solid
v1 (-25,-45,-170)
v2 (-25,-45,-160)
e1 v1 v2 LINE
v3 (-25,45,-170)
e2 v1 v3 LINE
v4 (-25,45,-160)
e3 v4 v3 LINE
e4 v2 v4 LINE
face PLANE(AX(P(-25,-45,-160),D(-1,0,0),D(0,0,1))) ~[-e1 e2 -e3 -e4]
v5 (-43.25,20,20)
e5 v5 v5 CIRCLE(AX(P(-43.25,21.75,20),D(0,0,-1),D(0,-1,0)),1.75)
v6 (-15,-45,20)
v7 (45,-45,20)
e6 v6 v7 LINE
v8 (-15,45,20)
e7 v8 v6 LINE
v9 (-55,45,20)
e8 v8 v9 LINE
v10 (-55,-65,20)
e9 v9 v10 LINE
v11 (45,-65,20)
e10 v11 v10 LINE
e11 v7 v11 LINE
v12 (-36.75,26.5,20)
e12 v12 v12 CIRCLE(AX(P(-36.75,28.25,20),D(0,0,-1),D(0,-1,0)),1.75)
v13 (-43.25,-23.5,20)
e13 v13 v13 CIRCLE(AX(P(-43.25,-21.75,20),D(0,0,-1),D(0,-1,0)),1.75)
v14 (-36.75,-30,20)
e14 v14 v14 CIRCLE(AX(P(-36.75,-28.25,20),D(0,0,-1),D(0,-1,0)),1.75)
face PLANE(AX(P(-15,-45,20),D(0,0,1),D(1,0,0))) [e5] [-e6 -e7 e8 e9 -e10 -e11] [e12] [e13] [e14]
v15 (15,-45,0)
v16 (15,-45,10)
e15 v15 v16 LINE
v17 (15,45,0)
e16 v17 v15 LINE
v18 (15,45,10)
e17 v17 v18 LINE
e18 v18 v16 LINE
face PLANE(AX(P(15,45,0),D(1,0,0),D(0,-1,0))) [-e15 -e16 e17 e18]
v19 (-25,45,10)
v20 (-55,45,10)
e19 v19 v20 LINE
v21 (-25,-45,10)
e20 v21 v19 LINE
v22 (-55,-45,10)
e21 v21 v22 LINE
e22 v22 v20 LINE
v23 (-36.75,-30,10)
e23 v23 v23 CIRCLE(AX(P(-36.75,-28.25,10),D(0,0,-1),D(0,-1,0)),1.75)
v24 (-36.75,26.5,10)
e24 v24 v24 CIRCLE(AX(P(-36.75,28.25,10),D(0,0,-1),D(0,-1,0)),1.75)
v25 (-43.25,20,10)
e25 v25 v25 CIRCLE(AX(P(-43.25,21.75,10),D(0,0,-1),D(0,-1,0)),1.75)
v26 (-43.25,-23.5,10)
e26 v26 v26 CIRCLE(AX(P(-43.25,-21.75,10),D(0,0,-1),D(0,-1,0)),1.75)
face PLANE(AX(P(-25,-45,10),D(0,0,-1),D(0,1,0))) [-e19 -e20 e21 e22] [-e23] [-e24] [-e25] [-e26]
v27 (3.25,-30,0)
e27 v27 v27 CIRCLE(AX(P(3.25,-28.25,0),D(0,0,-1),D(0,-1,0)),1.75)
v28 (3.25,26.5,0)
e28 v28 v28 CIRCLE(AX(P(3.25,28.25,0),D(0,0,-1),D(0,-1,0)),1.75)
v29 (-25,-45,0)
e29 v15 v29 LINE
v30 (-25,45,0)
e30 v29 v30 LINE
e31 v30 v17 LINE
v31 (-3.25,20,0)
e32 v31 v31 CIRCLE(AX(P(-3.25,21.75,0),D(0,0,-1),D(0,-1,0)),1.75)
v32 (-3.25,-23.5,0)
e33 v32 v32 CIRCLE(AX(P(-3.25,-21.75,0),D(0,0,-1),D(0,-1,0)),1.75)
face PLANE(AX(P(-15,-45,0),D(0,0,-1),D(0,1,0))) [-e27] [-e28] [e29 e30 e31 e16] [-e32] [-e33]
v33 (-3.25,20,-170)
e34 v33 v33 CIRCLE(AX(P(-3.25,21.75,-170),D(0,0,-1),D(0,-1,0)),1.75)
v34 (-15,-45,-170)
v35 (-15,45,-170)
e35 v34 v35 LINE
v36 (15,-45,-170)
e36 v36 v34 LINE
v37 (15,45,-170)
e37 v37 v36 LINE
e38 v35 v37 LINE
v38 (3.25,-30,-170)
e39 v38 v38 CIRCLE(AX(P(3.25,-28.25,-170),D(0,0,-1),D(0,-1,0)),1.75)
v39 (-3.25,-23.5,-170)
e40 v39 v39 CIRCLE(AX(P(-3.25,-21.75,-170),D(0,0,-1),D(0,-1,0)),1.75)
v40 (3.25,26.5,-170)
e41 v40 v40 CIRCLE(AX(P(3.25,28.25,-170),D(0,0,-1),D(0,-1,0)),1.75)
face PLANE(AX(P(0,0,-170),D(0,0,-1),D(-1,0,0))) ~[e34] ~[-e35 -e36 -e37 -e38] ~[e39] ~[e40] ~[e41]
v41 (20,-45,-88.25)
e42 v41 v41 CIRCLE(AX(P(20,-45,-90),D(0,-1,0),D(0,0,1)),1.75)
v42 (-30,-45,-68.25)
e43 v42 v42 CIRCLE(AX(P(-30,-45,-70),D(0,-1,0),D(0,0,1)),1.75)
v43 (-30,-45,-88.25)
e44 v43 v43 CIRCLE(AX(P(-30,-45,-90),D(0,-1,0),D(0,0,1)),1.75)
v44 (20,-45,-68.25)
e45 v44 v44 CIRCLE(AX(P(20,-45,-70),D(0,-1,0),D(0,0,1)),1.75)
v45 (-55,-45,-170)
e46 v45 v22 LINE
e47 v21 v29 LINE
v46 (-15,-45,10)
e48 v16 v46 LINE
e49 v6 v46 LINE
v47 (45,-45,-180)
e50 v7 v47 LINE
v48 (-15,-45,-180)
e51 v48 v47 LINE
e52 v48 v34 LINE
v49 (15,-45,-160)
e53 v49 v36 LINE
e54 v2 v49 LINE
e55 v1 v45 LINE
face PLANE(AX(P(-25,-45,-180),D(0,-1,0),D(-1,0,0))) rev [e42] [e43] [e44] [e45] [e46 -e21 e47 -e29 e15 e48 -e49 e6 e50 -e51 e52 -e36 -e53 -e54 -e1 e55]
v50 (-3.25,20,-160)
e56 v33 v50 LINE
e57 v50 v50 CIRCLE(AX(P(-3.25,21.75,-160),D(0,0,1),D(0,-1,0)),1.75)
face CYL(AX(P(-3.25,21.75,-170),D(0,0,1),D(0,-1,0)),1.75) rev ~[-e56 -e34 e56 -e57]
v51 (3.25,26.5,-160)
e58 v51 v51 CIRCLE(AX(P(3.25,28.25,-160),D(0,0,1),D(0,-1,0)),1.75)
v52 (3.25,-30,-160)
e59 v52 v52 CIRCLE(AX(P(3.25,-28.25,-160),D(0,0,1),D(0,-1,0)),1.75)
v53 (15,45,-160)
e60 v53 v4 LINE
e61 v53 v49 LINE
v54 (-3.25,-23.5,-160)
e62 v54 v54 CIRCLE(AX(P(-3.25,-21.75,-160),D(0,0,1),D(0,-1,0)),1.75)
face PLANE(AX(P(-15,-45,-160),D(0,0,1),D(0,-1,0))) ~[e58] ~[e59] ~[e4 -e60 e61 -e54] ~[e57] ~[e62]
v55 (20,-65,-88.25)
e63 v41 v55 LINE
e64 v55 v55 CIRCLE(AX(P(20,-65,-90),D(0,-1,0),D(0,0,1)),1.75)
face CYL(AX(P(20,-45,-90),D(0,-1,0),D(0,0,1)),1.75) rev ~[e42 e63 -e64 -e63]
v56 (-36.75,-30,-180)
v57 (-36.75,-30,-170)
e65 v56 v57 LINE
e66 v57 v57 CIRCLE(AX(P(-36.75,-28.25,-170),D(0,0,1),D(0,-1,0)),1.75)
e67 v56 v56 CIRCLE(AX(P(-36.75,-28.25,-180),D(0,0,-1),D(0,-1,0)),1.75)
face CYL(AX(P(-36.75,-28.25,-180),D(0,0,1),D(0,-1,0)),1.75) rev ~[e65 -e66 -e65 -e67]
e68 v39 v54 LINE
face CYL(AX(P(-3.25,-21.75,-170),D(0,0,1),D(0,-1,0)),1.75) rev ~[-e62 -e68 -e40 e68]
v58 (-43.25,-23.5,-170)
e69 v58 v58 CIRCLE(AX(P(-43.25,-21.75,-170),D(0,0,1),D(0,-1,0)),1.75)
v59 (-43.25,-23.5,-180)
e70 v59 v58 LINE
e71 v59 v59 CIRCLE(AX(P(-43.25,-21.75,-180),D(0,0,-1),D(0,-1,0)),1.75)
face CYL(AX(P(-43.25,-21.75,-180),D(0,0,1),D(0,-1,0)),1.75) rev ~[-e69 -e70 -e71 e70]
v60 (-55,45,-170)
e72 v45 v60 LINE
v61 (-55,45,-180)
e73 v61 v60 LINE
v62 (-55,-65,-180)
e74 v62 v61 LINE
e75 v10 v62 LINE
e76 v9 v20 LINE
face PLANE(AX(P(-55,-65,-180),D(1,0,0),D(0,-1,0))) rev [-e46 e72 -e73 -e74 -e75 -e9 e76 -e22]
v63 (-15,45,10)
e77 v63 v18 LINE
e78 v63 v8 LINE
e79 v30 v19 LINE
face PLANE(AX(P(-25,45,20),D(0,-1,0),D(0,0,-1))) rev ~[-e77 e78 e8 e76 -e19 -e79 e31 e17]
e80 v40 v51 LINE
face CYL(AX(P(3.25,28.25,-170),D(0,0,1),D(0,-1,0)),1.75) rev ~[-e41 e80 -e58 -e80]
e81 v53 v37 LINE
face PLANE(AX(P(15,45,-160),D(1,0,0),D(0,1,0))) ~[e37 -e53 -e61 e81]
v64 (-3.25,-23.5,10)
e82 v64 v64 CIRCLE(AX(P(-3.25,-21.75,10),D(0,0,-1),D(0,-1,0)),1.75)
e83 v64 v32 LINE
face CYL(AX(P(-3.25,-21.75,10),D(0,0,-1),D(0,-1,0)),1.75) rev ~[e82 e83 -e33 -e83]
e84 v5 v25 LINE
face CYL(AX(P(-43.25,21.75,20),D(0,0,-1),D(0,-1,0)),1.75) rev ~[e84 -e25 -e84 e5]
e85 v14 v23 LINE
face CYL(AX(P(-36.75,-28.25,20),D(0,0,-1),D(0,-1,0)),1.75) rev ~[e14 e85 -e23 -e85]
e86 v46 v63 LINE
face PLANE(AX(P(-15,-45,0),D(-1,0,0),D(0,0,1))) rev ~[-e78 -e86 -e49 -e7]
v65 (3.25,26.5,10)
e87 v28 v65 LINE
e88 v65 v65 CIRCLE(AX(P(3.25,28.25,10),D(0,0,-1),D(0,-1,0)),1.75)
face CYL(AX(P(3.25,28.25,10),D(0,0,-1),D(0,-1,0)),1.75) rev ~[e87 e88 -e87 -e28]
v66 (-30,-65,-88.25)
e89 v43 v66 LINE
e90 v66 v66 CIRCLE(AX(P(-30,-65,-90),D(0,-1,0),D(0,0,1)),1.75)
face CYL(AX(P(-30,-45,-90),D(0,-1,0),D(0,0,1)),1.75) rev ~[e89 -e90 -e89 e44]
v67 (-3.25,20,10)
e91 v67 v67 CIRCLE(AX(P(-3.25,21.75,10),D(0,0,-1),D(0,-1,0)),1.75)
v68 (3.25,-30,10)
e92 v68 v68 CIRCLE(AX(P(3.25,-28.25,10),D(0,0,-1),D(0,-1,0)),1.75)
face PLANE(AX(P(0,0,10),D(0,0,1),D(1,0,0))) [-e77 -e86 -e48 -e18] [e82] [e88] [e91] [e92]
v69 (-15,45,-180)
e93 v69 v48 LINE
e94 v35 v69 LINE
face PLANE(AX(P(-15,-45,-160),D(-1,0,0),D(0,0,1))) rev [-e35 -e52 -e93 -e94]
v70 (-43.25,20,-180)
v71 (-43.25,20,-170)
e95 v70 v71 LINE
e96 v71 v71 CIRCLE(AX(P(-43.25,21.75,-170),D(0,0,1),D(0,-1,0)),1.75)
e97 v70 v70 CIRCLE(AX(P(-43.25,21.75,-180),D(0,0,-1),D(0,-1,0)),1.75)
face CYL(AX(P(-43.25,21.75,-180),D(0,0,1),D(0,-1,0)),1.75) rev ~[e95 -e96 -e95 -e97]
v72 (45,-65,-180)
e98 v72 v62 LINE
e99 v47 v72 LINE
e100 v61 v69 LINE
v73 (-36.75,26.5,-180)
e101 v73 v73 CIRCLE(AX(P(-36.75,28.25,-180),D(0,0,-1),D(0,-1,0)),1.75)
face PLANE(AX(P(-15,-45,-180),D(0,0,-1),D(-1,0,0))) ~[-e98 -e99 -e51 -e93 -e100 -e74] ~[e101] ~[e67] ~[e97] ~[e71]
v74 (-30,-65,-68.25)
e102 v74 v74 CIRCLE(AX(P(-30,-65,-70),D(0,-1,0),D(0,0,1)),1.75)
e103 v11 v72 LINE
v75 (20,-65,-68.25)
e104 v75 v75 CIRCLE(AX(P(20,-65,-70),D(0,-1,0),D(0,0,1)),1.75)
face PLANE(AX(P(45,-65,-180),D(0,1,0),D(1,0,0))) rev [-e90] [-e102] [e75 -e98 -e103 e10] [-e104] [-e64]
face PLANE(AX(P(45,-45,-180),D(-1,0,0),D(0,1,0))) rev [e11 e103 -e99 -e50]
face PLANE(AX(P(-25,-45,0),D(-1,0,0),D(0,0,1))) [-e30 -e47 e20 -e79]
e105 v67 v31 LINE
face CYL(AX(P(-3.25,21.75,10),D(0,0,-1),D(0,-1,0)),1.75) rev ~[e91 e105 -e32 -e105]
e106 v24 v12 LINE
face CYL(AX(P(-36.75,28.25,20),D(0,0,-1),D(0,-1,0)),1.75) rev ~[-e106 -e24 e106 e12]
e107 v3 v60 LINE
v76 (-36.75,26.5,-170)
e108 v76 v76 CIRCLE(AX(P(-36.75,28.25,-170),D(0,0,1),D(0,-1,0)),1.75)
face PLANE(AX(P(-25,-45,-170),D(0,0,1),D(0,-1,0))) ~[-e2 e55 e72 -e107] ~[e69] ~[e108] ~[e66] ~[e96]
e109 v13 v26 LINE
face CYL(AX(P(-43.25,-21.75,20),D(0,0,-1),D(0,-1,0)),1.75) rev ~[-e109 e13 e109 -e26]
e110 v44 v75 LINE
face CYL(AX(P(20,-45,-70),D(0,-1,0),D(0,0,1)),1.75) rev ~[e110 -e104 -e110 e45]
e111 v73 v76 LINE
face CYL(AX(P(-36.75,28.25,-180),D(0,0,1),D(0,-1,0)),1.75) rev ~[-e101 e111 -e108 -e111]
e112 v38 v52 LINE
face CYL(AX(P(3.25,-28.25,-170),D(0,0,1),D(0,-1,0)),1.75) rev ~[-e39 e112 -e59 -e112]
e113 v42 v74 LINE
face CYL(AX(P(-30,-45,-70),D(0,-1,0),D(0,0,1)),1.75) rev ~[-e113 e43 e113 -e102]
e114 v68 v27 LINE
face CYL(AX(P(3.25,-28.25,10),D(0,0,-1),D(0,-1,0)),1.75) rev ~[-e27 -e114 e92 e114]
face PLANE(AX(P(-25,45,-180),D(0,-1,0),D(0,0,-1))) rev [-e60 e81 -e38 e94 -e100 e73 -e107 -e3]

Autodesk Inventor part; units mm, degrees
ref_plane "YZ Plane" through (0, 0, 0) normal (1, 0, 0) x (0, 1, 0)
ref_plane "XZ Plane" through (0, 0, 0) normal (0, 1, 0) x (-1, 0, 0)
ref_plane "XY Plane" through (0, 0, 0) normal (0, 0, 1) x (1, 0, 0)
sketch "Boceto1" plane through (0, 0, 0) normal (0, 0, 1) x (1, 0, 0)
  line L0 (-15, 45) -> (15, 45)
  line L1 (15, 45) -> (15, -45)
  line L2 (15, -45) -> (-15, -45)
  line L3 (-15, -45) -> (-15, 45)
  line L4 (-15, 45) -> (15, -45) construction
  line L5 (15, 45) -> (-15, -45) construction
  point P0 (0, 0)
  dimension "d0" = 30
  dimension "d1" = 90
extrude "Extrusión1" add sketch "Boceto1" along normal blind 10
sketch "Boceto2" plane through (0, 0, 10) normal (0, 0, 1) x (1, 0, 0)
  line L0 (15, 45) -> (15, -45)
  line L1 (5, 30) -> (5, 20)
  line L2 (-5, 30) -> (5, 30)
  line L3 (5, 20) -> (-5, 30) construction
  line L4 (5, 20) -> (-5, 20)
  line L5 (-5, 20) -> (5, 30) construction
  line L6 (-5, 20) -> (-5, 30)
  line L7 (24, 0) -> (9, 0)
  line L8 (-15, -45) -> (15, -45)
  line L9 (5, 25) -> (5.4102, 25)
  circle A0 centre (-3.25, 21.75) radius 1.75
  circle A1 centre (3.25, 28.25) radius 1.75
  line L10 (5, -20) -> (-5, -20)
  circle A2 centre (-3.25, -21.75) radius 1.75
  line L11 (5, -25) -> (5.4102, -25)
  line L12 (5, -30) -> (5, -20)
  line L13 (-5, -30) -> (5, -30)
  line L14 (5, -20) -> (-5, -30) construction
  line L15 (-5, -20) -> (5, -30) construction
  line L16 (-5, -20) -> (-5, -30)
  circle A3 centre (3.25, -28.25) radius 1.75
  line L17 (-15, -45) -> (-15, 45)
  line L18 (15, -45) -> (15, 45) projected
  line L19 (-15, -45) -> (15, -45) projected
  line L20 (-15, 45) -> (15, 45)
  line L21 (-3.25, 28.25) -> (3.25, 21.75)
  line L22 (-3.25, 21.75) -> (3.25, 28.25)
  point P0 (0, 0)
  point P1 (-113, 215)
  point P2 (-5, 25)
  point P3 (-3.25, -21.75)
  point P4 (3.25, -28.25)
  point P5 (-143, 115)
  point P6 (-3.25, -21.75)
  point P7 (-5, -25)
  point P8 (3.25, -28.25)
  point P9 (0, 25)
  point P10 (0, -25)
  dimension "d4" = 1.75
  dimension "d5" = 1.75
  dimension "d6" = 1.75
  dimension "d7" = 1.75
  dimension "d8" = 10
  dimension "d9" = 10
  dimension "d10" = 10
  dimension "d11" = 15
  dimension "d12" = 0
  dimension "d13" = 30
  dimension "d14" = 0
  dimension "d15" = 90
  dimension "d16" = 15
hole "Agujero1" at (3.25, 28.25, 10) at (-3.25, 21.75, 10) at (-3.25, -21.75, 10) at (3.25, -28.25, 10) direction (0, 0, -1) diameter 3.5 end through all
sketch "Boceto3" plane through (-15, -45, 0) normal (-1, 0, 0) x (0, 0, 1)
  line L0 (0, 0) -> (0, 90) projected
  line L1 (0, 90) -> (20, 90)
  line L2 (20, 90) -> (20, 0)
  line L3 (20, 0) -> (0, 0)
  line L4 (0, 0) -> (0, 90)
  point P0 (0, 45)
  dimension "d24" = 20
  dimension "d25" = 90
extrude "Extrusión2" add sketch "Boceto3" along normal blind 10
sketch "Boceto4" plane through (-25, -45, 0) normal (-1, 0, 0) x (0, 0, 1)
  line L0 (20, 90) -> (10, 90) projected
  line L1 (10, 0) -> (10, 90) projected
  line L2 (20, 90) -> (10, 90)
  line L3 (10, 90) -> (10, 0)
  line L4 (10, 0) -> (20, 0)
  line L5 (20, 0) -> (20, 90)
  point P0 (0, 45)
extrude "Extrusión3" add sketch "Boceto4" along normal blind 30
sketch "Boceto5" plane through (-15, -45, 20) normal (0, 0, 1) x (1, 0, 0)
  line L0 (-40, 0) -> (-70, 90)
  line L1 (-70, 90) -> (-40, 0)
  line L2 (-20, 75) -> (-20, 65)
  line L3 (-30, 75) -> (-20, 75)
  line L4 (-20, 65) -> (-30, 75) construction
  line L5 (-20, 65) -> (-30, 65)
  line L6 (-30, 65) -> (-20, 75) construction
  circle A0 centre (-28.25, 66.75) radius 1.75
  line L7 (-30, 65) -> (-30, 75)
  circle A1 centre (-21.75, 73.25) radius 1.75
  line L8 (-40, -20) -> (-40, 90)
  line L9 (-55, 45) -> (-143, 45)
  line L10 (-20, 25) -> (-30, 25)
  circle A2 centre (-28.25, 23.25) radius 1.75
  line L11 (-20, 15) -> (-20, 25)
  line L12 (-20, 25) -> (-30, 15) construction
  line L13 (-30, 25) -> (-20, 15) construction
  line L14 (-30, 25) -> (-30, 15)
  line L15 (-30, 15) -> (-20, 15)
  circle A3 centre (-21.75, 16.75) radius 1.75
  line L16 (-70, 0) -> (-40, 0)
  line L17 (0, 0) -> (-40, 0) projected
  line L18 (-40, 90) -> (-70, 90)
  line L19 (-40, 0) -> (-40, 90) projected
  point P0 (15, 45)
  point P1 (-30, 70)
  point P2 (-20, 70)
  point P3 (-20, 20)
  point P4 (-30, 20)
  point P5 (-55, 0)
  point P6 (-55, 90)
  dimension "d30" = 3.5
  dimension "d31" = 1.75
  dimension "d32" = 1.75
  dimension "d33" = 1.75
  dimension "d34" = 1.75
  dimension "d35" = 10
  dimension "d36" = 10
  dimension "d38" = 10
  dimension "d39" = -41.1096
  dimension "d40" = 15
  dimension "d41" = 0
  dimension "d42" = 15
  dimension "d43" = 90
  dimension "d45" = 0
hole "Agujero2" at (-36.75, 28.25, 20) at (-43.25, 21.75, 20) at (-43.25, -21.75, 20) at (-36.75, -28.25, 20) direction (0, 0, -1) diameter 3.5 end through all
sketch "Boceto6" plane through (-15, -45, 20) normal (0, 0, 1) x (1, 0, 0)
  line L0 (-10, 0) -> (-40, 0) projected
  line L1 (-40, 0) -> (60, 0)
  line L2 (60, 0) -> (60, -20)
  line L3 (60, -20) -> (-40, -20)
  line L4 (-40, -20) -> (-40, 0)
  point P0 (15, 45)
  dimension "d53" = 20
extrude "Extrusión4" add sketch "Boceto6" against normal blind 100
mirror "Simetría1" about plane through (-5, -55, -80) normal (0, 0, -1) of "Extrusión1", "Agujero1", "Extrusión2", "Agujero2", "Extrusión3", "Extrusión4"
ref_plane "Plano de trabajo2" through (45, -65, -80) normal (0, 0, -1) x (-1, 0, 0)
sketch "Boceto7" plane through (-15, -45, 20) normal (0, 1, 0) x (1, 0, 0)
  line L0 (30, 115) -> (30, 85)
  circle A0 centre (35, 90) radius 1.75
  line L1 (30, 85) -> (40, 85)
  line L2 (35, 110) -> (35, 90)
  circle A1 centre (35, 110) radius 1.75
  line L3 (40, 115) -> (30, 85) construction
  line L4 (40, 115) -> (30, 115)
  line L5 (30, 115) -> (40, 85) construction
  line L6 (40, 85) -> (40, 115)
  line L7 (60, 0) -> (60, 200) projected
  line L8 (-40, 0) -> (60, 0) projected
  line L9 (10, 0) -> (10, 134.4524)
  line L10 (-10, 115) -> (-10, 85)
  circle A2 centre (-15, 110) radius 1.75
  line L11 (-20, 115) -> (-10, 115)
  circle A3 centre (-15, 90) radius 1.75
  line L12 (-10, 85) -> (-20, 85)
  line L13 (-20, 115) -> (-10, 85) construction
  line L14 (-10, 115) -> (-20, 85) construction
  line L15 (-20, 85) -> (-20, 115)
  line L16 (-15, 110) -> (-15, 90)
  point P0 (15, 20)
  point P1 (189.1833, 40)
  point P2 (35, 115)
  point P3 (-85.8367, 100)
  point P4 (235.02, 100)
  point P5 (-15, 115)
  dimension "d56" = 5
  dimension "d57" = 5
  dimension "d58" = 3.5
  dimension "d59" = 5
  dimension "d60" = 5
  dimension "d61" = 10
  dimension "d62" = 30
  dimension "d64" = 20
hole "Agujero3" at (-30, -45, -90) at (-30, -45, -70) at (20, -45, -90) at (20, -45, -70) direction (0, -1, 0) diameter 3.5 end through all
properties part number "container_mid"
